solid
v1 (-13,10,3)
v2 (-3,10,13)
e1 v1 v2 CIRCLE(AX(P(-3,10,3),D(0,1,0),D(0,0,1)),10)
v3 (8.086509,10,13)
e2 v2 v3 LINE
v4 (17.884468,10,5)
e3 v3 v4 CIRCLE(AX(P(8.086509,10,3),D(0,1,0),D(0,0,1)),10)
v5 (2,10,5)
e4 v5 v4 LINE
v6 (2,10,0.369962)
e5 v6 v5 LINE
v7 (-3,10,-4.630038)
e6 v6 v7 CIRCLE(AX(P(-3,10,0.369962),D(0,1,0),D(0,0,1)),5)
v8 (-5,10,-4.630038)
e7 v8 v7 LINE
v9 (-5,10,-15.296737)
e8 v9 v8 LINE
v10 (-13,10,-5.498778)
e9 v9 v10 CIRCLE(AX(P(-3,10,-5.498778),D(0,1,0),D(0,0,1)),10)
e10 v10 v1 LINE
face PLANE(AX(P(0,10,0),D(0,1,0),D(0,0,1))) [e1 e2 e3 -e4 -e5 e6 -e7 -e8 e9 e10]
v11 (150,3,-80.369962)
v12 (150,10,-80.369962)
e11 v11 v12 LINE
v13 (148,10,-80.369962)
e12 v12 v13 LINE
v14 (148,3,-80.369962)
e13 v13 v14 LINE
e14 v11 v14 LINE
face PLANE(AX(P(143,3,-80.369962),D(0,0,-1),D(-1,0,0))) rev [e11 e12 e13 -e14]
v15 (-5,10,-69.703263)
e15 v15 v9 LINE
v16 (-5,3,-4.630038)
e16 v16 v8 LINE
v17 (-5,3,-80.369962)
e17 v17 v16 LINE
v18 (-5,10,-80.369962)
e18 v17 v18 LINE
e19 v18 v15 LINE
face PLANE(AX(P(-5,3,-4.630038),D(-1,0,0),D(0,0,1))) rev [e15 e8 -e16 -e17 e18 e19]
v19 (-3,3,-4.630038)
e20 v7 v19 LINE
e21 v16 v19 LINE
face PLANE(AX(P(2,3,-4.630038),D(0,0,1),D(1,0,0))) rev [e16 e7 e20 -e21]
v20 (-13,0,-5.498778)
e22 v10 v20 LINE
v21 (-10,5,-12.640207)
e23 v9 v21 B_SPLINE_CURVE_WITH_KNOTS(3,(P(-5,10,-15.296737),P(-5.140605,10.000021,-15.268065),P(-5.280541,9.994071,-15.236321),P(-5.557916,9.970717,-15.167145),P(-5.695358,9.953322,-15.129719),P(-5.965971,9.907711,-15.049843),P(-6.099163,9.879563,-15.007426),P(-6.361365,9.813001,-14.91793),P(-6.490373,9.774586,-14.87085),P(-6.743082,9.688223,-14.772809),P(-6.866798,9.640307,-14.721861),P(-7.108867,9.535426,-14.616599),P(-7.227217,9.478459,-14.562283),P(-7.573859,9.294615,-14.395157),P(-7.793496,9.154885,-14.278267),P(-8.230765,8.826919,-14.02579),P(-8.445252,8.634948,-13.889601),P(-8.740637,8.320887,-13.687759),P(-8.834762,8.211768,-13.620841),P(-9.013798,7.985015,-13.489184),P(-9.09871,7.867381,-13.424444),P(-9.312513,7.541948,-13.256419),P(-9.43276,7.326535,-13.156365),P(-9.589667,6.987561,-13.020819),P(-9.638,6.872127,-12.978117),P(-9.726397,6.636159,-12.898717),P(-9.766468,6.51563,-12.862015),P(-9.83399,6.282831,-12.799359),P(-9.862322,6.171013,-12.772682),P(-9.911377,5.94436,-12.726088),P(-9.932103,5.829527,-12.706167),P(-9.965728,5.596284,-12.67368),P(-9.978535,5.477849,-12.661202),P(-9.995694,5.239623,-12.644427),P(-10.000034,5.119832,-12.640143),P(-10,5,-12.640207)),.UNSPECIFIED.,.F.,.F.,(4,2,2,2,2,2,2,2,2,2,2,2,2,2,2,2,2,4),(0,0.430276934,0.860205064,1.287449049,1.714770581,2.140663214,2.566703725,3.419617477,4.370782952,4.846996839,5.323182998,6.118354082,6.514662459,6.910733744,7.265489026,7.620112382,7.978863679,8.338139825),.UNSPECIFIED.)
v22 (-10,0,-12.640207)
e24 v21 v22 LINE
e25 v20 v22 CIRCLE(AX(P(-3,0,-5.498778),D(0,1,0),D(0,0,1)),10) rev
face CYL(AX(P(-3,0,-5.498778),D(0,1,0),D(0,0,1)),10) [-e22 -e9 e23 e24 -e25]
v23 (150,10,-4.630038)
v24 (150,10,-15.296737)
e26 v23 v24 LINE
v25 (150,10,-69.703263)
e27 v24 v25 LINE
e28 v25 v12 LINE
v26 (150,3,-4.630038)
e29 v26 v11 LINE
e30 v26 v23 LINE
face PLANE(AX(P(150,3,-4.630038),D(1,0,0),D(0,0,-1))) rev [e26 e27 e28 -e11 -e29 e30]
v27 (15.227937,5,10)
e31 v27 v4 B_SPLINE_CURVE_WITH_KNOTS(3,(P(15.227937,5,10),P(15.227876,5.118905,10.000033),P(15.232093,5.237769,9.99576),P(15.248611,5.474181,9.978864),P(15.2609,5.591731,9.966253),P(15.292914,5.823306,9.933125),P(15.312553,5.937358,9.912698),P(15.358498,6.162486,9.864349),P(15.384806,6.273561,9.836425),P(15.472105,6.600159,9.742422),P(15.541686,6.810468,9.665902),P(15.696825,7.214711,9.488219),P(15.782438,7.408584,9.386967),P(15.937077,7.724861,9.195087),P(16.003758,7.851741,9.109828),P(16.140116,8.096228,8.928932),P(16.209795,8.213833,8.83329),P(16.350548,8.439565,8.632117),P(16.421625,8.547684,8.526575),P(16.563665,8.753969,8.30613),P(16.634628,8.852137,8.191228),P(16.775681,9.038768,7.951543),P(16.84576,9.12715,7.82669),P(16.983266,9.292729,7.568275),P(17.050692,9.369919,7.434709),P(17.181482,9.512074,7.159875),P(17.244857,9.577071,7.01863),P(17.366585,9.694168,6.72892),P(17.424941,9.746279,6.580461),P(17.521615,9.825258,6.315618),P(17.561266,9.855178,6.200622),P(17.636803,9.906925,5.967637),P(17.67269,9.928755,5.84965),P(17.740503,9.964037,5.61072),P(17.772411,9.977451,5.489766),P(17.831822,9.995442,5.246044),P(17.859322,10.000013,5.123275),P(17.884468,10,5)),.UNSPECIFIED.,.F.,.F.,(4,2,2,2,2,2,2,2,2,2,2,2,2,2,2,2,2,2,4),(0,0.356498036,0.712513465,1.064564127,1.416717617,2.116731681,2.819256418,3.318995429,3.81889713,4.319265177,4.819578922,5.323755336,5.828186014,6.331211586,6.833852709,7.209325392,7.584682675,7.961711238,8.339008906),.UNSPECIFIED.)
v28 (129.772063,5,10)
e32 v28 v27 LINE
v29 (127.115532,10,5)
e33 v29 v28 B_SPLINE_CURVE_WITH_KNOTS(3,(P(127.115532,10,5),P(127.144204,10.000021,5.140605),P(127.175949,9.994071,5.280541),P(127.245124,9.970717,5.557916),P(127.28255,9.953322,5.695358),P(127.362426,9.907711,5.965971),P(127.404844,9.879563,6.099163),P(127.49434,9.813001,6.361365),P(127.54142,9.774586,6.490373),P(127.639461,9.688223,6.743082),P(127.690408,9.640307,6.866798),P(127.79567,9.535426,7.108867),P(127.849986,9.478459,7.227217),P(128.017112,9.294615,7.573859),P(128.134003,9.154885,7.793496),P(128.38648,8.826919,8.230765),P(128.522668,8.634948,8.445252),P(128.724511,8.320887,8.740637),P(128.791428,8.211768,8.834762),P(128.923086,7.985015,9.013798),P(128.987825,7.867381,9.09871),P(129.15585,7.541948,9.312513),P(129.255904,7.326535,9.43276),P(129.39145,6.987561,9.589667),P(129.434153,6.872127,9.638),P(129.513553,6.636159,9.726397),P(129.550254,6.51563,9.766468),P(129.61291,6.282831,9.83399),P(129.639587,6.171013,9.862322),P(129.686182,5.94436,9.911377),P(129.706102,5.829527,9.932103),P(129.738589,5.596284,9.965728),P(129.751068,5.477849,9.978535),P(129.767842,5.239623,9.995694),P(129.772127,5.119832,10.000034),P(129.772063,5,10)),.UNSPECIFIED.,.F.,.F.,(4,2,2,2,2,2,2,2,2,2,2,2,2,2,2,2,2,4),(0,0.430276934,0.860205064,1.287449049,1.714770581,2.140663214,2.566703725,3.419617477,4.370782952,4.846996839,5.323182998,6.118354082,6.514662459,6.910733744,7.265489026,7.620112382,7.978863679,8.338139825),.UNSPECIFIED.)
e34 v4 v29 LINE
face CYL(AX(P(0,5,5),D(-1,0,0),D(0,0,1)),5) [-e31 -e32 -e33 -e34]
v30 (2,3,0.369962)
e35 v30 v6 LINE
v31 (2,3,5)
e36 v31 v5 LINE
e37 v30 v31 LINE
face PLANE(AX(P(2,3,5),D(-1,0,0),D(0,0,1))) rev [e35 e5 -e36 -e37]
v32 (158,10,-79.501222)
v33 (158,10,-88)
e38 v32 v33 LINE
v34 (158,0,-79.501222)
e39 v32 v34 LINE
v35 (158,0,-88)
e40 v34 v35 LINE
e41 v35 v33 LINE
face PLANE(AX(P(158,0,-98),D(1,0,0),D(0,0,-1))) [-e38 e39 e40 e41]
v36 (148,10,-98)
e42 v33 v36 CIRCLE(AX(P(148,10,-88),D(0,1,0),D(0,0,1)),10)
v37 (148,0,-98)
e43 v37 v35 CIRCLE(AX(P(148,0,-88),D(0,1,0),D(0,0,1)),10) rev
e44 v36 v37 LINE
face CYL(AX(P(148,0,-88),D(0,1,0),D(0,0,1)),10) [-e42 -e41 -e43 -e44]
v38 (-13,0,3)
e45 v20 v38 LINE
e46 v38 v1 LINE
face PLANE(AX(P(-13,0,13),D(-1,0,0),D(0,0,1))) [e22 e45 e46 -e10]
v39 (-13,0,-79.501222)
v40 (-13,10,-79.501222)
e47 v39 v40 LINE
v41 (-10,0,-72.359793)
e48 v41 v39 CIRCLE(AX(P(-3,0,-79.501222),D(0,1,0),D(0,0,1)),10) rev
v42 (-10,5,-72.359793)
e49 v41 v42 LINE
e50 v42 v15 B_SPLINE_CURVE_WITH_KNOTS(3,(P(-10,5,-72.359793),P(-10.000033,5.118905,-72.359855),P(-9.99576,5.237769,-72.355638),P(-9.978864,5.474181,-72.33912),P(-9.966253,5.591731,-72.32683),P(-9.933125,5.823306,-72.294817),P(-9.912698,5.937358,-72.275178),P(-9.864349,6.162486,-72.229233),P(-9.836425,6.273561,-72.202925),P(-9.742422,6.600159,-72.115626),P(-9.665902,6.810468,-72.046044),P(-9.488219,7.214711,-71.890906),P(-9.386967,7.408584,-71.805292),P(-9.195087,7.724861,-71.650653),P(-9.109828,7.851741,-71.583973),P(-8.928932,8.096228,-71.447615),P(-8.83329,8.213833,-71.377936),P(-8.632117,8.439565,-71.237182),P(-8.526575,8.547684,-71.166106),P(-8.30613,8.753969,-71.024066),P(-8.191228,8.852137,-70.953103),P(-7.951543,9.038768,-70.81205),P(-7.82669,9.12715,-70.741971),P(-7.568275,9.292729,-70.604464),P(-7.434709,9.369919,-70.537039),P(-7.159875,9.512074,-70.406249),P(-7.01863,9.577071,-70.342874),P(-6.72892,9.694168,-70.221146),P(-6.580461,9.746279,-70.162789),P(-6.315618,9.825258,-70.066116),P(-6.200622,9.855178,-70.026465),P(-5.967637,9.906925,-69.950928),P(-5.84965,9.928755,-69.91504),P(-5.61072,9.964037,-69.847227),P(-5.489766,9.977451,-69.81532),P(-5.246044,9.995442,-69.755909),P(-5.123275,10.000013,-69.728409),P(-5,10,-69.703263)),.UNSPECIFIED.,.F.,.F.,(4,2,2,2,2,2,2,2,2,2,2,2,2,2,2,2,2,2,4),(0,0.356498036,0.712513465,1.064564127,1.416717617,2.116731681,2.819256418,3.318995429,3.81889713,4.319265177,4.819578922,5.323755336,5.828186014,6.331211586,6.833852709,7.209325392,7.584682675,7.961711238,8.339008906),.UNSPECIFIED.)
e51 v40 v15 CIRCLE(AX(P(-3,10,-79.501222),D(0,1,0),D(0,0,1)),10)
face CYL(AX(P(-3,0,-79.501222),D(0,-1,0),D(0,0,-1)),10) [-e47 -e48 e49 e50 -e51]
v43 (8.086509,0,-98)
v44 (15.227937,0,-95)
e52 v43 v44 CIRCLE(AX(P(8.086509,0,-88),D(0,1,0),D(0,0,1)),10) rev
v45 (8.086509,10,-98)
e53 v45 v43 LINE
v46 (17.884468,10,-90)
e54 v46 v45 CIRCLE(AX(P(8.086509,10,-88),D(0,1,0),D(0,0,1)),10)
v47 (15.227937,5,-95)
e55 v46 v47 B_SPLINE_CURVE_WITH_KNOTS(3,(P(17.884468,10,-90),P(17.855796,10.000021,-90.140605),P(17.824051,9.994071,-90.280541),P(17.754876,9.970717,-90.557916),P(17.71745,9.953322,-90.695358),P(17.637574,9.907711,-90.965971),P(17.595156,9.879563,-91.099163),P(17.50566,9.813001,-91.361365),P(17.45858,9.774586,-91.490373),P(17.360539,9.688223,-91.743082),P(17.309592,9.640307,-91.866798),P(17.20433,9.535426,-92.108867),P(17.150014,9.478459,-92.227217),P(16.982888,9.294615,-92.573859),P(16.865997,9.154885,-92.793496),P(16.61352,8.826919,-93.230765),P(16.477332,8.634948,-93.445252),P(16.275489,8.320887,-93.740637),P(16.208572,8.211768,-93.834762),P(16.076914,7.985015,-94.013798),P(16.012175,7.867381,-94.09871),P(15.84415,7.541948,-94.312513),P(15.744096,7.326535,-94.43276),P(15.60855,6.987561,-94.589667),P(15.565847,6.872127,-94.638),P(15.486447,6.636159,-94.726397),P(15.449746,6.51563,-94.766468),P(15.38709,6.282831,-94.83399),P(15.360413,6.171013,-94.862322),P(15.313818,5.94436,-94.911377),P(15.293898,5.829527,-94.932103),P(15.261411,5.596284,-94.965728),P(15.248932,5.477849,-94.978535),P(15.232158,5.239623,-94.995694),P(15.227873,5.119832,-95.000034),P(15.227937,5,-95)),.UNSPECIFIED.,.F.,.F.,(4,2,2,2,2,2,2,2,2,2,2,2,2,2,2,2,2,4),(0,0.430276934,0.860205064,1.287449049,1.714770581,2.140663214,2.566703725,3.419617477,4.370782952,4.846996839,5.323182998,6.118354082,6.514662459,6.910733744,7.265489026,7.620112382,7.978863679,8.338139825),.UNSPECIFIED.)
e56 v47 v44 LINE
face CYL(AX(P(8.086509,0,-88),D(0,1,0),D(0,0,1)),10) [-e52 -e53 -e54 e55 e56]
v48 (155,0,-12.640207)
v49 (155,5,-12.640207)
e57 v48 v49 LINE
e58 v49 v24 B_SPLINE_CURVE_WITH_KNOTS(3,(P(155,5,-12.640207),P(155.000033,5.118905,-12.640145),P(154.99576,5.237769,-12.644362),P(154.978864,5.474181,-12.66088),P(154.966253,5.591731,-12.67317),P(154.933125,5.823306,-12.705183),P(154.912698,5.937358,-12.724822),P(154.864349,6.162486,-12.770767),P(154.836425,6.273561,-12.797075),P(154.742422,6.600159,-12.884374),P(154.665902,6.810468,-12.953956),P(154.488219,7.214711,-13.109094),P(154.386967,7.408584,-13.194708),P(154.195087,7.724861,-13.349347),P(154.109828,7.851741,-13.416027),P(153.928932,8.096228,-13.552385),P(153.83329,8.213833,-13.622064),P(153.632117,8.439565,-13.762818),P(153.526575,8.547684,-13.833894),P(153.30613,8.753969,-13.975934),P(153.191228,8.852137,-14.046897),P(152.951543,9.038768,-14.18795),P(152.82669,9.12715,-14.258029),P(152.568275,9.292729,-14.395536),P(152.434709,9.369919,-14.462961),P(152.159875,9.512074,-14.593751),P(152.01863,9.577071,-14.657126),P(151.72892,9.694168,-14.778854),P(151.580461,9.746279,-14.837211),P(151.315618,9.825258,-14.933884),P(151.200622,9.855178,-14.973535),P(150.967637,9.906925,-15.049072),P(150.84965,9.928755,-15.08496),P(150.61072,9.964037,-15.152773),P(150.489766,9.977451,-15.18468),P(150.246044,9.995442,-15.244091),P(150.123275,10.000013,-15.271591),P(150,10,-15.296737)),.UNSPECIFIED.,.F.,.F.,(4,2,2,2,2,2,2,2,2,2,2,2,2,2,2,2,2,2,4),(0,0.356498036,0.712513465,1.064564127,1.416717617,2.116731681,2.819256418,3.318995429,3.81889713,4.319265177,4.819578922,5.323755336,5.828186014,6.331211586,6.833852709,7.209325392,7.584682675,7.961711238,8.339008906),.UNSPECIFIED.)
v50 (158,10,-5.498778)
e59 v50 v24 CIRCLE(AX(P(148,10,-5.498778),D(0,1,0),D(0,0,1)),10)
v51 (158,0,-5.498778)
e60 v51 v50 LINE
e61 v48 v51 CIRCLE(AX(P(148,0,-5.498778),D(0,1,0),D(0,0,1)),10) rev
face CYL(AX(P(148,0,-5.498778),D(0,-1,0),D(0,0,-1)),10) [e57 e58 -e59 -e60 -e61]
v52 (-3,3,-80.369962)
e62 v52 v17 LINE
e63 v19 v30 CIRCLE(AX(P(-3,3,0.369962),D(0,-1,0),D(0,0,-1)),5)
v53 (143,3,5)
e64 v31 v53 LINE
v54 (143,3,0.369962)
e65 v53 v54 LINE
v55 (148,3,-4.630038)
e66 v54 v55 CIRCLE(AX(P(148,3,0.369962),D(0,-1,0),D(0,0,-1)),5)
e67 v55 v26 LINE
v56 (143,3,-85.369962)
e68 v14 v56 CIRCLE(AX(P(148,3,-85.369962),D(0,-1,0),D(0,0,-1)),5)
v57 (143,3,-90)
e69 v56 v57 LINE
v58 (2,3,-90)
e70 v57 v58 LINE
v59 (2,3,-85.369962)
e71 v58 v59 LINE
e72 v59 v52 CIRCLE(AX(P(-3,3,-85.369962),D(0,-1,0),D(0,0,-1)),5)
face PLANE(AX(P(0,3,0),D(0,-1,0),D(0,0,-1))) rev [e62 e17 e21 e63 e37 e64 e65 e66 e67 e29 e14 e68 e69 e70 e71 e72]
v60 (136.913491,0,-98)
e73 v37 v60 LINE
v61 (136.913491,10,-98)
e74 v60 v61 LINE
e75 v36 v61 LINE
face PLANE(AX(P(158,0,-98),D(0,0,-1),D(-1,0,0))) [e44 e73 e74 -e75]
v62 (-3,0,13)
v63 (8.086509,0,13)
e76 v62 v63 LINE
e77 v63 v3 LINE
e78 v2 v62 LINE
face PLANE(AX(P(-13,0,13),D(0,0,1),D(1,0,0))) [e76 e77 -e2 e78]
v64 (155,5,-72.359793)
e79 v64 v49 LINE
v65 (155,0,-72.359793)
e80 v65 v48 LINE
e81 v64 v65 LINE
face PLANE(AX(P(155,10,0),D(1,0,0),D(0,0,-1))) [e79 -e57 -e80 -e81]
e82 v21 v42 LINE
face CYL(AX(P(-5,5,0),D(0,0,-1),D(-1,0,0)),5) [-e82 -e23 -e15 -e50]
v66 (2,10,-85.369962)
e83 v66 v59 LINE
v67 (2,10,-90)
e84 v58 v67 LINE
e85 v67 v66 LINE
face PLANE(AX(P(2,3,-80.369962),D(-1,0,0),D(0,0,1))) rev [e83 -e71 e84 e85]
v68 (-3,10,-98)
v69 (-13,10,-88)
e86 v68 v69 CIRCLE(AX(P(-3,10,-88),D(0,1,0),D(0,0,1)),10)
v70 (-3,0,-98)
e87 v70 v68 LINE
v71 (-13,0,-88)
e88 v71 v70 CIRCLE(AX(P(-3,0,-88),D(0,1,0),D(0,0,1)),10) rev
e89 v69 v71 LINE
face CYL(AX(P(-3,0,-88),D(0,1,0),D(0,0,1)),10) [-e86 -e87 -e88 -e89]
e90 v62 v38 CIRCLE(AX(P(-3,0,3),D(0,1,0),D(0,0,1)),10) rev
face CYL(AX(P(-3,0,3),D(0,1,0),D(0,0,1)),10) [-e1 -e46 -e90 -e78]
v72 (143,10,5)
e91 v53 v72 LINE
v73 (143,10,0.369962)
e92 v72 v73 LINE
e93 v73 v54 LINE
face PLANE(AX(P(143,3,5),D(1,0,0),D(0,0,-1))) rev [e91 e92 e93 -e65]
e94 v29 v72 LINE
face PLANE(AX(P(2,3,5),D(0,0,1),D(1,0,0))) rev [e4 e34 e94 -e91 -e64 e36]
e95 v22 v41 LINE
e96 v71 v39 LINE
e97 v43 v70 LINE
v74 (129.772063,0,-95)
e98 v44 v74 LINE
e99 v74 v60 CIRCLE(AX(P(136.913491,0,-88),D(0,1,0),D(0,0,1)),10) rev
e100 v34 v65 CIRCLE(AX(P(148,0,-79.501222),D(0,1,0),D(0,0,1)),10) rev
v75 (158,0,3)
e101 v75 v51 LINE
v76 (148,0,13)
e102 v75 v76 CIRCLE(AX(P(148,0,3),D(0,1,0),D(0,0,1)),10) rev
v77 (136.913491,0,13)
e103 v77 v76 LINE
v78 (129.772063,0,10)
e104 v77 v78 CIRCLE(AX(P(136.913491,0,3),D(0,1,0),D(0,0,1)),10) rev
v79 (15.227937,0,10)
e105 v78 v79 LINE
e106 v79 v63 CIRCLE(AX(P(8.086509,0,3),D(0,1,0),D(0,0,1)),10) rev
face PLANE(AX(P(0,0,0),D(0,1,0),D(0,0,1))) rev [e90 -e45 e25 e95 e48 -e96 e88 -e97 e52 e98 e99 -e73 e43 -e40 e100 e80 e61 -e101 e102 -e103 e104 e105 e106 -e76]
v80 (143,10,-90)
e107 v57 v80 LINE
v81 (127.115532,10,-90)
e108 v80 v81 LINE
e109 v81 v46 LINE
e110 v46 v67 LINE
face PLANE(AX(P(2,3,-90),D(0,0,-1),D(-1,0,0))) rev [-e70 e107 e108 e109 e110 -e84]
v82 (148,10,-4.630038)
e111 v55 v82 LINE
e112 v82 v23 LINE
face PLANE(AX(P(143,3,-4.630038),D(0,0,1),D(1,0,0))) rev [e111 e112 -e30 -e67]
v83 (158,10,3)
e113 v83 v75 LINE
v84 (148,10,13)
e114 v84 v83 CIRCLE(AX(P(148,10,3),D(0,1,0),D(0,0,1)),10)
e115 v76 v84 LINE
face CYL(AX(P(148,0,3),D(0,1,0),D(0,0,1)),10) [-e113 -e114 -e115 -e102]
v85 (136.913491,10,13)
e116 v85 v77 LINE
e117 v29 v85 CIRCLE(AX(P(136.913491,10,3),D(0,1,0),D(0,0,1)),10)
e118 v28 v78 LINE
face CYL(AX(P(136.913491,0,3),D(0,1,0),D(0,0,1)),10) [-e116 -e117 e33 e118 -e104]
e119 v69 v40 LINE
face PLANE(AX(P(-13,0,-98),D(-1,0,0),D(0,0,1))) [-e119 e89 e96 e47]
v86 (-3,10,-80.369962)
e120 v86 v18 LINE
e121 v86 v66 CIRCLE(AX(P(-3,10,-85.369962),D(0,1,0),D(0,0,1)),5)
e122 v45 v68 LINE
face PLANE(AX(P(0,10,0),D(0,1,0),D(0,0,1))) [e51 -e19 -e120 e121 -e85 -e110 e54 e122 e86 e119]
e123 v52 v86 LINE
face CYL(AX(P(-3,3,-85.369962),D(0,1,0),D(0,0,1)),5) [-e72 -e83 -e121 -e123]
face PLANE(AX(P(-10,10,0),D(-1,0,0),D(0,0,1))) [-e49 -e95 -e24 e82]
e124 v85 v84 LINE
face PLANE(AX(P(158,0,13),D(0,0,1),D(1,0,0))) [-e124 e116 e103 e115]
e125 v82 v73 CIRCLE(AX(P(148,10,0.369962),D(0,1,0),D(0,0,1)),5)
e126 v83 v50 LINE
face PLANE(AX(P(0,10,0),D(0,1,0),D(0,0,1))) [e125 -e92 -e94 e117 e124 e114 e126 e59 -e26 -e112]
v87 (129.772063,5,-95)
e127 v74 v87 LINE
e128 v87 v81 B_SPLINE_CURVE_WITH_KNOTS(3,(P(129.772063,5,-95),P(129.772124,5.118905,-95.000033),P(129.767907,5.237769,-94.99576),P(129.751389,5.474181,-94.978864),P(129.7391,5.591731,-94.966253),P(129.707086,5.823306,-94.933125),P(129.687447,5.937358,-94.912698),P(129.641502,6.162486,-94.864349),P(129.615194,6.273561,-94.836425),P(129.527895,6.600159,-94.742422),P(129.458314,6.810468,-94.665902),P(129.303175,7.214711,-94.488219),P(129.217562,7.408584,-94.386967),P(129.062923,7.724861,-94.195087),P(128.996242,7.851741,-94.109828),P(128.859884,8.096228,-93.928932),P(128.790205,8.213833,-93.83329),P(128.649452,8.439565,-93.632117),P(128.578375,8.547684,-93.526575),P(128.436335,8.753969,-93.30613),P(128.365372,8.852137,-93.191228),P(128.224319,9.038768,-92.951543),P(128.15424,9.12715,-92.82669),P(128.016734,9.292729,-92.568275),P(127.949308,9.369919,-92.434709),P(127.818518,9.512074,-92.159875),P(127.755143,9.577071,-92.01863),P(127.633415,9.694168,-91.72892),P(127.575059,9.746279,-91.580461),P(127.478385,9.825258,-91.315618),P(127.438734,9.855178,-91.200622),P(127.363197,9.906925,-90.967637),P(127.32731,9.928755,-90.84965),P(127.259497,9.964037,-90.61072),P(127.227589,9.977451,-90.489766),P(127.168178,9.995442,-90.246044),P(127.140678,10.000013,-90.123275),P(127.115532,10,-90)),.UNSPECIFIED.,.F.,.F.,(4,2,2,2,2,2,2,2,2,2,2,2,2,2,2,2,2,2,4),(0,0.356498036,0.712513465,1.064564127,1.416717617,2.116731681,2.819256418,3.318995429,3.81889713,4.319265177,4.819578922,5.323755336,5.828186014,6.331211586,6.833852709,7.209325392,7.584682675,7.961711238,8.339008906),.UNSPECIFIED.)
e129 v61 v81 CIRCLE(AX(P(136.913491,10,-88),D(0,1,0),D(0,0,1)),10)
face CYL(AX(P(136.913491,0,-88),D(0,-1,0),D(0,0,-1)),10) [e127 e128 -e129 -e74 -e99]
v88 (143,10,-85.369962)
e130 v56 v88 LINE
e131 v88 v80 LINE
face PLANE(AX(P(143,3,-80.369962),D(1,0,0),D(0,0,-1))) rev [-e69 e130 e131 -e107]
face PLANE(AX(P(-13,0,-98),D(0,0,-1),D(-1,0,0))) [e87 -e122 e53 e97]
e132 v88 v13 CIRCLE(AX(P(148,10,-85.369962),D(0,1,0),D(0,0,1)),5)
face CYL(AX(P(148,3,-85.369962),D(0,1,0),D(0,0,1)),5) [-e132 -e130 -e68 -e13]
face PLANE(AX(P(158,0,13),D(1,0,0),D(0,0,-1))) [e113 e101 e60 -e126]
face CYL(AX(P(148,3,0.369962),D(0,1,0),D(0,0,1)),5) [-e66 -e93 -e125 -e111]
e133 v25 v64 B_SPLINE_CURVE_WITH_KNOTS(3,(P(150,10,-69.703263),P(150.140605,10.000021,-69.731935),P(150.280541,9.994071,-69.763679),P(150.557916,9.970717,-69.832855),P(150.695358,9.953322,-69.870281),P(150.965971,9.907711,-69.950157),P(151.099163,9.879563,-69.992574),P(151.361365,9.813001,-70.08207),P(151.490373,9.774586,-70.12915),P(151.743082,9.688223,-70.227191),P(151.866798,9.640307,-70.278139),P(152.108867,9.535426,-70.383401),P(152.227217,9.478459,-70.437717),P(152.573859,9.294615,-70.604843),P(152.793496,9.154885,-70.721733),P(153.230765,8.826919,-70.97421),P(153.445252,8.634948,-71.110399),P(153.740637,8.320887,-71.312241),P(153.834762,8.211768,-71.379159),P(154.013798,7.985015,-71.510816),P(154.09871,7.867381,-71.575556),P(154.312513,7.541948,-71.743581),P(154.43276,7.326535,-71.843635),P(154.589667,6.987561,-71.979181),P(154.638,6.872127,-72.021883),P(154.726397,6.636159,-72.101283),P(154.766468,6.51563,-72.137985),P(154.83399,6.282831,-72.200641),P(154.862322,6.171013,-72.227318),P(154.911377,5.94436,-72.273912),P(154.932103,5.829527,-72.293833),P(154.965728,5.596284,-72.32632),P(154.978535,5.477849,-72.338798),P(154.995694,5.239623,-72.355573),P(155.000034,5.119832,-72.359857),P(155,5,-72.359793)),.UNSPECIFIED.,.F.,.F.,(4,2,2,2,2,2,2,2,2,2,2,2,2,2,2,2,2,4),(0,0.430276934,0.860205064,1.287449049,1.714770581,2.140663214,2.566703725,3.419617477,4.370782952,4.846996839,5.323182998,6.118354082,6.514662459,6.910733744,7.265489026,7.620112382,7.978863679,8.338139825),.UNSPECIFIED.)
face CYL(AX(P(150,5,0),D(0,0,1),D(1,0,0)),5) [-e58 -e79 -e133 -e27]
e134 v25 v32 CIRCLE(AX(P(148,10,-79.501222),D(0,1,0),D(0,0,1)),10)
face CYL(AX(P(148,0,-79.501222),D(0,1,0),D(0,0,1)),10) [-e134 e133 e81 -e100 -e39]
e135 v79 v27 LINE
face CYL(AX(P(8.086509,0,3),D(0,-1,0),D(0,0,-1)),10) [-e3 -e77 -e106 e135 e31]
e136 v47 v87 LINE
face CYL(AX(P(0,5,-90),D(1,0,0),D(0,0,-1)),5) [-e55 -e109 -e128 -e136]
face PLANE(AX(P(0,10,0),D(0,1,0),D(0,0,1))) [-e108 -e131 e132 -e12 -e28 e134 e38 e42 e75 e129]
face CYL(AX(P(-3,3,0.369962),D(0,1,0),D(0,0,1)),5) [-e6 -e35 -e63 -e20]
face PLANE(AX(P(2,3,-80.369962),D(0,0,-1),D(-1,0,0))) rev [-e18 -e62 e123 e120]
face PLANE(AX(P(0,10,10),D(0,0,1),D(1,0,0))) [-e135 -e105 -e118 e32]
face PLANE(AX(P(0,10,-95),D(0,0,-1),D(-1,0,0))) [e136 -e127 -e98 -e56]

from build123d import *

# Parameters (mm, degrees)
SKETCH7_W           = 165
SKETCH7_H           = 105
SKETCH7_W_2         = 145
SKETCH7_H_2         = 85
BOSS_EXTRUDE7_DEPTH = 10
SKETCH8_W           = 28.227937213
SKETCH8_H           = 25.640206581
BOSS_EXTRUDE8_DEPTH = 10
CUT_EXTRUDE4_DEPTH  = 7
FILLET2_R           = 10
FILLET3_R           = 5
FILLET6_R           = 5


# Some blends are built 0.0001 mm under size
with BuildPart() as part:
    # Sketch7 → Boss-Extrude7 (new body)
    # profile 1 of 2: a face of its own
    with BuildSketch(Plane(origin=(0, 0, 0), x_dir=(1, 0, 0), z_dir=(0, 1, 0))):
        with Locations((72.5, 42.5)):
            Rectangle(SKETCH7_W, SKETCH7_H)
        with Locations((72.5, 42.5)):
            Rectangle(SKETCH7_W_2, SKETCH7_H_2, mode=Mode.SUBTRACT)
    # profile 2 of 2: a face of its own
    with BuildSketch(Plane(origin=(0, 0, 0), x_dir=(1, 0, 0), z_dir=(0, 1, 0))):
        with Locations((72.5, 42.5)):
            Rectangle(SKETCH7_W_2, SKETCH7_H_2)
    extrude(amount=BOSS_EXTRUDE7_DEPTH)

    # Sketch8 → Boss-Extrude8 (add)
    with BuildSketch(Plane(origin=(0, 10, 0), x_dir=(1, 0, 0), z_dir=(0, 1, 0))):
        with Locations((1.113968607, -0.179896709)):
            Rectangle(SKETCH8_W, SKETCH8_H)
        with Locations((143.886031393, -0.179896709)):
            Rectangle(SKETCH8_W, SKETCH8_H)
        with Locations((143.886031393, 85.179896709)):
            Rectangle(SKETCH8_W, SKETCH8_H)
        with Locations((1.113968607, 85.179896709)):
            Rectangle(SKETCH8_W, SKETCH8_H)
    extrude(amount=-BOSS_EXTRUDE8_DEPTH)

    # Sketch10 → Cut-Extrude4 (cut)
    with BuildSketch(Plane(origin=(0, 10, 0), x_dir=(1, 0, 0), z_dir=(0, 1, 0))):
        Polygon((2, -5), (143, -5), (143, 4.63003775), (150, 4.63003775), (150, 80.36996225), (143, 80.36996225), (143, 90), (2, 90), (2, 80.36996225), (-5, 80.36996225), (-5, 4.63003775), (2, 4.63003775), align=None)
    extrude(amount=-CUT_EXTRUDE4_DEPTH, mode=Mode.SUBTRACT)

    # Fillet2
    # the kernel refuses this fillet: 10 mm, written as the material it takes off along each edge
    with BuildSketch(Plane(origin=(-13, 27.853571071, -72.359793419), x_dir=(1, 0, 0), z_dir=(0, -1, 0)), Plane(origin=(129.772062787, 27.853571071, -98), x_dir=(0, 0, 1), z_dir=(0, -1, 0)), Plane(origin=(158, 27.853571071, -12.640206581), x_dir=(-1, 0, 0), z_dir=(0, -1, 0)), Plane(origin=(15.227937213, 27.853571071, 13), x_dir=(0, 0, -1), z_dir=(0, -1, 0))) as fillet2_piece_1:
        with BuildLine():
            CenterArc((10, -7.141428429), FILLET2_R, 134.427004001, 45.572995999)
            Line((0, -7.141428429), (-0.2, -7.141428429))
            Line((-0.2, -7.141428429), (-0.2, 0))
            Line((-0.2, 0), (0, 0.2))
            ThreePointArc((0, 0.2), (1.5, 0.2), (2.86, 0.142828569))
            Line((2.86, 0.142828569), (3, 0))
        make_face()
    extrude(amount=45.707142143, mode=Mode.SUBTRACT)
    with BuildSketch(Plane(origin=(15.227937213, 27.853571071, -98), x_dir=(-1, 0, 0), z_dir=(0, -1, 0)), Plane(origin=(-13, 27.853571071, -12.640206581), x_dir=(0, 0, 1), z_dir=(0, -1, 0)), Plane(origin=(158, 27.853571071, -72.359793419), x_dir=(0, 0, -1), z_dir=(0, -1, 0)), Plane(origin=(129.772062787, 27.853571071, 13), x_dir=(1, 0, 0), z_dir=(0, -1, 0))) as fillet2_piece_2:
        with BuildLine():
            CenterArc((7.141428429, -10), FILLET2_R, 90, 45.572995999)
            Line((0, -3), (-0.142828569, -2.86))
            ThreePointArc((-0.142828569, -2.86), (-0.2, -1.5), (-0.2, 0))
            Line((-0.2, 0), (0, 0.2))
            Line((0, 0.2), (7.141428429, 0.2))
            Line((7.141428429, 0.2), (7.141428429, 0))
        make_face()
    extrude(amount=45.707142143, mode=Mode.SUBTRACT)
    with BuildSketch(Plane(origin=(-13, 35, -98), x_dir=(0, 0, 1), z_dir=(0, -1, 0)), Plane(origin=(158, 35, -98), x_dir=(-1, 0, 0), z_dir=(0, -1, 0)), Plane(origin=(158, 35, 13), x_dir=(0, 0, -1), z_dir=(0, -1, 0))) as fillet2_piece_3:
        with BuildLine():
            CenterArc((FILLET2_R, -FILLET2_R), FILLET2_R, 90, 90)
            Line((0, -FILLET2_R), (-FILLET2_R * 0.02, -FILLET2_R))
            Line((-FILLET2_R * 0.02, -FILLET2_R), (-FILLET2_R * 0.02, FILLET2_R * 0.02))
            Line((-FILLET2_R * 0.02, FILLET2_R * 0.02), (FILLET2_R, FILLET2_R * 0.02))
            Line((FILLET2_R, FILLET2_R * 0.02), (FILLET2_R, 0))
        make_face()
    extrude(amount=60, mode=Mode.SUBTRACT)
    with BuildSketch(Plane(origin=(-13, 35, 13), x_dir=(0, 0, -1), z_dir=(0, -1, 0))) as fillet2_piece_4:
        with BuildLine():
            CenterArc((FILLET2_R, FILLET2_R), FILLET2_R, 180, 90)
            Line((0, FILLET2_R), (-FILLET2_R * 0.02, FILLET2_R))
            Line((-FILLET2_R * 0.02, FILLET2_R), (-FILLET2_R * 0.02, -FILLET2_R * 0.02))
            Line((-FILLET2_R * 0.02, -FILLET2_R * 0.02), (FILLET2_R, -FILLET2_R * 0.02))
            Line((FILLET2_R, -FILLET2_R * 0.02), (FILLET2_R, 0))
        make_face()
    extrude(amount=60, mode=Mode.SUBTRACT)

    # Fillet3
    fillet3_edges = [part.edges().sort_by_distance(p)[0] for p in [
        (143, 6.5, -80.36996225),
        (143, 6.5, -4.63003775),
        (2, 6.5, -4.63003775),
        (2, 6.5, -80.36996225),
    ]]
    fillet(fillet3_edges, radius=FILLET3_R)

    # Fillet6
    fillet6_edges = [part.edges().sort_by_distance(p)[0] for p in [
        (72.5, 10, -95),
        (155, 10, -42.5),
        (72.5, 10, 10),
        (-10, 10, -42.5),
    ]]
    fillet(fillet6_edges, radius=FILLET6_R - 0.0001)  # a hair under: the kernel refuses the full size


solid = part.part
